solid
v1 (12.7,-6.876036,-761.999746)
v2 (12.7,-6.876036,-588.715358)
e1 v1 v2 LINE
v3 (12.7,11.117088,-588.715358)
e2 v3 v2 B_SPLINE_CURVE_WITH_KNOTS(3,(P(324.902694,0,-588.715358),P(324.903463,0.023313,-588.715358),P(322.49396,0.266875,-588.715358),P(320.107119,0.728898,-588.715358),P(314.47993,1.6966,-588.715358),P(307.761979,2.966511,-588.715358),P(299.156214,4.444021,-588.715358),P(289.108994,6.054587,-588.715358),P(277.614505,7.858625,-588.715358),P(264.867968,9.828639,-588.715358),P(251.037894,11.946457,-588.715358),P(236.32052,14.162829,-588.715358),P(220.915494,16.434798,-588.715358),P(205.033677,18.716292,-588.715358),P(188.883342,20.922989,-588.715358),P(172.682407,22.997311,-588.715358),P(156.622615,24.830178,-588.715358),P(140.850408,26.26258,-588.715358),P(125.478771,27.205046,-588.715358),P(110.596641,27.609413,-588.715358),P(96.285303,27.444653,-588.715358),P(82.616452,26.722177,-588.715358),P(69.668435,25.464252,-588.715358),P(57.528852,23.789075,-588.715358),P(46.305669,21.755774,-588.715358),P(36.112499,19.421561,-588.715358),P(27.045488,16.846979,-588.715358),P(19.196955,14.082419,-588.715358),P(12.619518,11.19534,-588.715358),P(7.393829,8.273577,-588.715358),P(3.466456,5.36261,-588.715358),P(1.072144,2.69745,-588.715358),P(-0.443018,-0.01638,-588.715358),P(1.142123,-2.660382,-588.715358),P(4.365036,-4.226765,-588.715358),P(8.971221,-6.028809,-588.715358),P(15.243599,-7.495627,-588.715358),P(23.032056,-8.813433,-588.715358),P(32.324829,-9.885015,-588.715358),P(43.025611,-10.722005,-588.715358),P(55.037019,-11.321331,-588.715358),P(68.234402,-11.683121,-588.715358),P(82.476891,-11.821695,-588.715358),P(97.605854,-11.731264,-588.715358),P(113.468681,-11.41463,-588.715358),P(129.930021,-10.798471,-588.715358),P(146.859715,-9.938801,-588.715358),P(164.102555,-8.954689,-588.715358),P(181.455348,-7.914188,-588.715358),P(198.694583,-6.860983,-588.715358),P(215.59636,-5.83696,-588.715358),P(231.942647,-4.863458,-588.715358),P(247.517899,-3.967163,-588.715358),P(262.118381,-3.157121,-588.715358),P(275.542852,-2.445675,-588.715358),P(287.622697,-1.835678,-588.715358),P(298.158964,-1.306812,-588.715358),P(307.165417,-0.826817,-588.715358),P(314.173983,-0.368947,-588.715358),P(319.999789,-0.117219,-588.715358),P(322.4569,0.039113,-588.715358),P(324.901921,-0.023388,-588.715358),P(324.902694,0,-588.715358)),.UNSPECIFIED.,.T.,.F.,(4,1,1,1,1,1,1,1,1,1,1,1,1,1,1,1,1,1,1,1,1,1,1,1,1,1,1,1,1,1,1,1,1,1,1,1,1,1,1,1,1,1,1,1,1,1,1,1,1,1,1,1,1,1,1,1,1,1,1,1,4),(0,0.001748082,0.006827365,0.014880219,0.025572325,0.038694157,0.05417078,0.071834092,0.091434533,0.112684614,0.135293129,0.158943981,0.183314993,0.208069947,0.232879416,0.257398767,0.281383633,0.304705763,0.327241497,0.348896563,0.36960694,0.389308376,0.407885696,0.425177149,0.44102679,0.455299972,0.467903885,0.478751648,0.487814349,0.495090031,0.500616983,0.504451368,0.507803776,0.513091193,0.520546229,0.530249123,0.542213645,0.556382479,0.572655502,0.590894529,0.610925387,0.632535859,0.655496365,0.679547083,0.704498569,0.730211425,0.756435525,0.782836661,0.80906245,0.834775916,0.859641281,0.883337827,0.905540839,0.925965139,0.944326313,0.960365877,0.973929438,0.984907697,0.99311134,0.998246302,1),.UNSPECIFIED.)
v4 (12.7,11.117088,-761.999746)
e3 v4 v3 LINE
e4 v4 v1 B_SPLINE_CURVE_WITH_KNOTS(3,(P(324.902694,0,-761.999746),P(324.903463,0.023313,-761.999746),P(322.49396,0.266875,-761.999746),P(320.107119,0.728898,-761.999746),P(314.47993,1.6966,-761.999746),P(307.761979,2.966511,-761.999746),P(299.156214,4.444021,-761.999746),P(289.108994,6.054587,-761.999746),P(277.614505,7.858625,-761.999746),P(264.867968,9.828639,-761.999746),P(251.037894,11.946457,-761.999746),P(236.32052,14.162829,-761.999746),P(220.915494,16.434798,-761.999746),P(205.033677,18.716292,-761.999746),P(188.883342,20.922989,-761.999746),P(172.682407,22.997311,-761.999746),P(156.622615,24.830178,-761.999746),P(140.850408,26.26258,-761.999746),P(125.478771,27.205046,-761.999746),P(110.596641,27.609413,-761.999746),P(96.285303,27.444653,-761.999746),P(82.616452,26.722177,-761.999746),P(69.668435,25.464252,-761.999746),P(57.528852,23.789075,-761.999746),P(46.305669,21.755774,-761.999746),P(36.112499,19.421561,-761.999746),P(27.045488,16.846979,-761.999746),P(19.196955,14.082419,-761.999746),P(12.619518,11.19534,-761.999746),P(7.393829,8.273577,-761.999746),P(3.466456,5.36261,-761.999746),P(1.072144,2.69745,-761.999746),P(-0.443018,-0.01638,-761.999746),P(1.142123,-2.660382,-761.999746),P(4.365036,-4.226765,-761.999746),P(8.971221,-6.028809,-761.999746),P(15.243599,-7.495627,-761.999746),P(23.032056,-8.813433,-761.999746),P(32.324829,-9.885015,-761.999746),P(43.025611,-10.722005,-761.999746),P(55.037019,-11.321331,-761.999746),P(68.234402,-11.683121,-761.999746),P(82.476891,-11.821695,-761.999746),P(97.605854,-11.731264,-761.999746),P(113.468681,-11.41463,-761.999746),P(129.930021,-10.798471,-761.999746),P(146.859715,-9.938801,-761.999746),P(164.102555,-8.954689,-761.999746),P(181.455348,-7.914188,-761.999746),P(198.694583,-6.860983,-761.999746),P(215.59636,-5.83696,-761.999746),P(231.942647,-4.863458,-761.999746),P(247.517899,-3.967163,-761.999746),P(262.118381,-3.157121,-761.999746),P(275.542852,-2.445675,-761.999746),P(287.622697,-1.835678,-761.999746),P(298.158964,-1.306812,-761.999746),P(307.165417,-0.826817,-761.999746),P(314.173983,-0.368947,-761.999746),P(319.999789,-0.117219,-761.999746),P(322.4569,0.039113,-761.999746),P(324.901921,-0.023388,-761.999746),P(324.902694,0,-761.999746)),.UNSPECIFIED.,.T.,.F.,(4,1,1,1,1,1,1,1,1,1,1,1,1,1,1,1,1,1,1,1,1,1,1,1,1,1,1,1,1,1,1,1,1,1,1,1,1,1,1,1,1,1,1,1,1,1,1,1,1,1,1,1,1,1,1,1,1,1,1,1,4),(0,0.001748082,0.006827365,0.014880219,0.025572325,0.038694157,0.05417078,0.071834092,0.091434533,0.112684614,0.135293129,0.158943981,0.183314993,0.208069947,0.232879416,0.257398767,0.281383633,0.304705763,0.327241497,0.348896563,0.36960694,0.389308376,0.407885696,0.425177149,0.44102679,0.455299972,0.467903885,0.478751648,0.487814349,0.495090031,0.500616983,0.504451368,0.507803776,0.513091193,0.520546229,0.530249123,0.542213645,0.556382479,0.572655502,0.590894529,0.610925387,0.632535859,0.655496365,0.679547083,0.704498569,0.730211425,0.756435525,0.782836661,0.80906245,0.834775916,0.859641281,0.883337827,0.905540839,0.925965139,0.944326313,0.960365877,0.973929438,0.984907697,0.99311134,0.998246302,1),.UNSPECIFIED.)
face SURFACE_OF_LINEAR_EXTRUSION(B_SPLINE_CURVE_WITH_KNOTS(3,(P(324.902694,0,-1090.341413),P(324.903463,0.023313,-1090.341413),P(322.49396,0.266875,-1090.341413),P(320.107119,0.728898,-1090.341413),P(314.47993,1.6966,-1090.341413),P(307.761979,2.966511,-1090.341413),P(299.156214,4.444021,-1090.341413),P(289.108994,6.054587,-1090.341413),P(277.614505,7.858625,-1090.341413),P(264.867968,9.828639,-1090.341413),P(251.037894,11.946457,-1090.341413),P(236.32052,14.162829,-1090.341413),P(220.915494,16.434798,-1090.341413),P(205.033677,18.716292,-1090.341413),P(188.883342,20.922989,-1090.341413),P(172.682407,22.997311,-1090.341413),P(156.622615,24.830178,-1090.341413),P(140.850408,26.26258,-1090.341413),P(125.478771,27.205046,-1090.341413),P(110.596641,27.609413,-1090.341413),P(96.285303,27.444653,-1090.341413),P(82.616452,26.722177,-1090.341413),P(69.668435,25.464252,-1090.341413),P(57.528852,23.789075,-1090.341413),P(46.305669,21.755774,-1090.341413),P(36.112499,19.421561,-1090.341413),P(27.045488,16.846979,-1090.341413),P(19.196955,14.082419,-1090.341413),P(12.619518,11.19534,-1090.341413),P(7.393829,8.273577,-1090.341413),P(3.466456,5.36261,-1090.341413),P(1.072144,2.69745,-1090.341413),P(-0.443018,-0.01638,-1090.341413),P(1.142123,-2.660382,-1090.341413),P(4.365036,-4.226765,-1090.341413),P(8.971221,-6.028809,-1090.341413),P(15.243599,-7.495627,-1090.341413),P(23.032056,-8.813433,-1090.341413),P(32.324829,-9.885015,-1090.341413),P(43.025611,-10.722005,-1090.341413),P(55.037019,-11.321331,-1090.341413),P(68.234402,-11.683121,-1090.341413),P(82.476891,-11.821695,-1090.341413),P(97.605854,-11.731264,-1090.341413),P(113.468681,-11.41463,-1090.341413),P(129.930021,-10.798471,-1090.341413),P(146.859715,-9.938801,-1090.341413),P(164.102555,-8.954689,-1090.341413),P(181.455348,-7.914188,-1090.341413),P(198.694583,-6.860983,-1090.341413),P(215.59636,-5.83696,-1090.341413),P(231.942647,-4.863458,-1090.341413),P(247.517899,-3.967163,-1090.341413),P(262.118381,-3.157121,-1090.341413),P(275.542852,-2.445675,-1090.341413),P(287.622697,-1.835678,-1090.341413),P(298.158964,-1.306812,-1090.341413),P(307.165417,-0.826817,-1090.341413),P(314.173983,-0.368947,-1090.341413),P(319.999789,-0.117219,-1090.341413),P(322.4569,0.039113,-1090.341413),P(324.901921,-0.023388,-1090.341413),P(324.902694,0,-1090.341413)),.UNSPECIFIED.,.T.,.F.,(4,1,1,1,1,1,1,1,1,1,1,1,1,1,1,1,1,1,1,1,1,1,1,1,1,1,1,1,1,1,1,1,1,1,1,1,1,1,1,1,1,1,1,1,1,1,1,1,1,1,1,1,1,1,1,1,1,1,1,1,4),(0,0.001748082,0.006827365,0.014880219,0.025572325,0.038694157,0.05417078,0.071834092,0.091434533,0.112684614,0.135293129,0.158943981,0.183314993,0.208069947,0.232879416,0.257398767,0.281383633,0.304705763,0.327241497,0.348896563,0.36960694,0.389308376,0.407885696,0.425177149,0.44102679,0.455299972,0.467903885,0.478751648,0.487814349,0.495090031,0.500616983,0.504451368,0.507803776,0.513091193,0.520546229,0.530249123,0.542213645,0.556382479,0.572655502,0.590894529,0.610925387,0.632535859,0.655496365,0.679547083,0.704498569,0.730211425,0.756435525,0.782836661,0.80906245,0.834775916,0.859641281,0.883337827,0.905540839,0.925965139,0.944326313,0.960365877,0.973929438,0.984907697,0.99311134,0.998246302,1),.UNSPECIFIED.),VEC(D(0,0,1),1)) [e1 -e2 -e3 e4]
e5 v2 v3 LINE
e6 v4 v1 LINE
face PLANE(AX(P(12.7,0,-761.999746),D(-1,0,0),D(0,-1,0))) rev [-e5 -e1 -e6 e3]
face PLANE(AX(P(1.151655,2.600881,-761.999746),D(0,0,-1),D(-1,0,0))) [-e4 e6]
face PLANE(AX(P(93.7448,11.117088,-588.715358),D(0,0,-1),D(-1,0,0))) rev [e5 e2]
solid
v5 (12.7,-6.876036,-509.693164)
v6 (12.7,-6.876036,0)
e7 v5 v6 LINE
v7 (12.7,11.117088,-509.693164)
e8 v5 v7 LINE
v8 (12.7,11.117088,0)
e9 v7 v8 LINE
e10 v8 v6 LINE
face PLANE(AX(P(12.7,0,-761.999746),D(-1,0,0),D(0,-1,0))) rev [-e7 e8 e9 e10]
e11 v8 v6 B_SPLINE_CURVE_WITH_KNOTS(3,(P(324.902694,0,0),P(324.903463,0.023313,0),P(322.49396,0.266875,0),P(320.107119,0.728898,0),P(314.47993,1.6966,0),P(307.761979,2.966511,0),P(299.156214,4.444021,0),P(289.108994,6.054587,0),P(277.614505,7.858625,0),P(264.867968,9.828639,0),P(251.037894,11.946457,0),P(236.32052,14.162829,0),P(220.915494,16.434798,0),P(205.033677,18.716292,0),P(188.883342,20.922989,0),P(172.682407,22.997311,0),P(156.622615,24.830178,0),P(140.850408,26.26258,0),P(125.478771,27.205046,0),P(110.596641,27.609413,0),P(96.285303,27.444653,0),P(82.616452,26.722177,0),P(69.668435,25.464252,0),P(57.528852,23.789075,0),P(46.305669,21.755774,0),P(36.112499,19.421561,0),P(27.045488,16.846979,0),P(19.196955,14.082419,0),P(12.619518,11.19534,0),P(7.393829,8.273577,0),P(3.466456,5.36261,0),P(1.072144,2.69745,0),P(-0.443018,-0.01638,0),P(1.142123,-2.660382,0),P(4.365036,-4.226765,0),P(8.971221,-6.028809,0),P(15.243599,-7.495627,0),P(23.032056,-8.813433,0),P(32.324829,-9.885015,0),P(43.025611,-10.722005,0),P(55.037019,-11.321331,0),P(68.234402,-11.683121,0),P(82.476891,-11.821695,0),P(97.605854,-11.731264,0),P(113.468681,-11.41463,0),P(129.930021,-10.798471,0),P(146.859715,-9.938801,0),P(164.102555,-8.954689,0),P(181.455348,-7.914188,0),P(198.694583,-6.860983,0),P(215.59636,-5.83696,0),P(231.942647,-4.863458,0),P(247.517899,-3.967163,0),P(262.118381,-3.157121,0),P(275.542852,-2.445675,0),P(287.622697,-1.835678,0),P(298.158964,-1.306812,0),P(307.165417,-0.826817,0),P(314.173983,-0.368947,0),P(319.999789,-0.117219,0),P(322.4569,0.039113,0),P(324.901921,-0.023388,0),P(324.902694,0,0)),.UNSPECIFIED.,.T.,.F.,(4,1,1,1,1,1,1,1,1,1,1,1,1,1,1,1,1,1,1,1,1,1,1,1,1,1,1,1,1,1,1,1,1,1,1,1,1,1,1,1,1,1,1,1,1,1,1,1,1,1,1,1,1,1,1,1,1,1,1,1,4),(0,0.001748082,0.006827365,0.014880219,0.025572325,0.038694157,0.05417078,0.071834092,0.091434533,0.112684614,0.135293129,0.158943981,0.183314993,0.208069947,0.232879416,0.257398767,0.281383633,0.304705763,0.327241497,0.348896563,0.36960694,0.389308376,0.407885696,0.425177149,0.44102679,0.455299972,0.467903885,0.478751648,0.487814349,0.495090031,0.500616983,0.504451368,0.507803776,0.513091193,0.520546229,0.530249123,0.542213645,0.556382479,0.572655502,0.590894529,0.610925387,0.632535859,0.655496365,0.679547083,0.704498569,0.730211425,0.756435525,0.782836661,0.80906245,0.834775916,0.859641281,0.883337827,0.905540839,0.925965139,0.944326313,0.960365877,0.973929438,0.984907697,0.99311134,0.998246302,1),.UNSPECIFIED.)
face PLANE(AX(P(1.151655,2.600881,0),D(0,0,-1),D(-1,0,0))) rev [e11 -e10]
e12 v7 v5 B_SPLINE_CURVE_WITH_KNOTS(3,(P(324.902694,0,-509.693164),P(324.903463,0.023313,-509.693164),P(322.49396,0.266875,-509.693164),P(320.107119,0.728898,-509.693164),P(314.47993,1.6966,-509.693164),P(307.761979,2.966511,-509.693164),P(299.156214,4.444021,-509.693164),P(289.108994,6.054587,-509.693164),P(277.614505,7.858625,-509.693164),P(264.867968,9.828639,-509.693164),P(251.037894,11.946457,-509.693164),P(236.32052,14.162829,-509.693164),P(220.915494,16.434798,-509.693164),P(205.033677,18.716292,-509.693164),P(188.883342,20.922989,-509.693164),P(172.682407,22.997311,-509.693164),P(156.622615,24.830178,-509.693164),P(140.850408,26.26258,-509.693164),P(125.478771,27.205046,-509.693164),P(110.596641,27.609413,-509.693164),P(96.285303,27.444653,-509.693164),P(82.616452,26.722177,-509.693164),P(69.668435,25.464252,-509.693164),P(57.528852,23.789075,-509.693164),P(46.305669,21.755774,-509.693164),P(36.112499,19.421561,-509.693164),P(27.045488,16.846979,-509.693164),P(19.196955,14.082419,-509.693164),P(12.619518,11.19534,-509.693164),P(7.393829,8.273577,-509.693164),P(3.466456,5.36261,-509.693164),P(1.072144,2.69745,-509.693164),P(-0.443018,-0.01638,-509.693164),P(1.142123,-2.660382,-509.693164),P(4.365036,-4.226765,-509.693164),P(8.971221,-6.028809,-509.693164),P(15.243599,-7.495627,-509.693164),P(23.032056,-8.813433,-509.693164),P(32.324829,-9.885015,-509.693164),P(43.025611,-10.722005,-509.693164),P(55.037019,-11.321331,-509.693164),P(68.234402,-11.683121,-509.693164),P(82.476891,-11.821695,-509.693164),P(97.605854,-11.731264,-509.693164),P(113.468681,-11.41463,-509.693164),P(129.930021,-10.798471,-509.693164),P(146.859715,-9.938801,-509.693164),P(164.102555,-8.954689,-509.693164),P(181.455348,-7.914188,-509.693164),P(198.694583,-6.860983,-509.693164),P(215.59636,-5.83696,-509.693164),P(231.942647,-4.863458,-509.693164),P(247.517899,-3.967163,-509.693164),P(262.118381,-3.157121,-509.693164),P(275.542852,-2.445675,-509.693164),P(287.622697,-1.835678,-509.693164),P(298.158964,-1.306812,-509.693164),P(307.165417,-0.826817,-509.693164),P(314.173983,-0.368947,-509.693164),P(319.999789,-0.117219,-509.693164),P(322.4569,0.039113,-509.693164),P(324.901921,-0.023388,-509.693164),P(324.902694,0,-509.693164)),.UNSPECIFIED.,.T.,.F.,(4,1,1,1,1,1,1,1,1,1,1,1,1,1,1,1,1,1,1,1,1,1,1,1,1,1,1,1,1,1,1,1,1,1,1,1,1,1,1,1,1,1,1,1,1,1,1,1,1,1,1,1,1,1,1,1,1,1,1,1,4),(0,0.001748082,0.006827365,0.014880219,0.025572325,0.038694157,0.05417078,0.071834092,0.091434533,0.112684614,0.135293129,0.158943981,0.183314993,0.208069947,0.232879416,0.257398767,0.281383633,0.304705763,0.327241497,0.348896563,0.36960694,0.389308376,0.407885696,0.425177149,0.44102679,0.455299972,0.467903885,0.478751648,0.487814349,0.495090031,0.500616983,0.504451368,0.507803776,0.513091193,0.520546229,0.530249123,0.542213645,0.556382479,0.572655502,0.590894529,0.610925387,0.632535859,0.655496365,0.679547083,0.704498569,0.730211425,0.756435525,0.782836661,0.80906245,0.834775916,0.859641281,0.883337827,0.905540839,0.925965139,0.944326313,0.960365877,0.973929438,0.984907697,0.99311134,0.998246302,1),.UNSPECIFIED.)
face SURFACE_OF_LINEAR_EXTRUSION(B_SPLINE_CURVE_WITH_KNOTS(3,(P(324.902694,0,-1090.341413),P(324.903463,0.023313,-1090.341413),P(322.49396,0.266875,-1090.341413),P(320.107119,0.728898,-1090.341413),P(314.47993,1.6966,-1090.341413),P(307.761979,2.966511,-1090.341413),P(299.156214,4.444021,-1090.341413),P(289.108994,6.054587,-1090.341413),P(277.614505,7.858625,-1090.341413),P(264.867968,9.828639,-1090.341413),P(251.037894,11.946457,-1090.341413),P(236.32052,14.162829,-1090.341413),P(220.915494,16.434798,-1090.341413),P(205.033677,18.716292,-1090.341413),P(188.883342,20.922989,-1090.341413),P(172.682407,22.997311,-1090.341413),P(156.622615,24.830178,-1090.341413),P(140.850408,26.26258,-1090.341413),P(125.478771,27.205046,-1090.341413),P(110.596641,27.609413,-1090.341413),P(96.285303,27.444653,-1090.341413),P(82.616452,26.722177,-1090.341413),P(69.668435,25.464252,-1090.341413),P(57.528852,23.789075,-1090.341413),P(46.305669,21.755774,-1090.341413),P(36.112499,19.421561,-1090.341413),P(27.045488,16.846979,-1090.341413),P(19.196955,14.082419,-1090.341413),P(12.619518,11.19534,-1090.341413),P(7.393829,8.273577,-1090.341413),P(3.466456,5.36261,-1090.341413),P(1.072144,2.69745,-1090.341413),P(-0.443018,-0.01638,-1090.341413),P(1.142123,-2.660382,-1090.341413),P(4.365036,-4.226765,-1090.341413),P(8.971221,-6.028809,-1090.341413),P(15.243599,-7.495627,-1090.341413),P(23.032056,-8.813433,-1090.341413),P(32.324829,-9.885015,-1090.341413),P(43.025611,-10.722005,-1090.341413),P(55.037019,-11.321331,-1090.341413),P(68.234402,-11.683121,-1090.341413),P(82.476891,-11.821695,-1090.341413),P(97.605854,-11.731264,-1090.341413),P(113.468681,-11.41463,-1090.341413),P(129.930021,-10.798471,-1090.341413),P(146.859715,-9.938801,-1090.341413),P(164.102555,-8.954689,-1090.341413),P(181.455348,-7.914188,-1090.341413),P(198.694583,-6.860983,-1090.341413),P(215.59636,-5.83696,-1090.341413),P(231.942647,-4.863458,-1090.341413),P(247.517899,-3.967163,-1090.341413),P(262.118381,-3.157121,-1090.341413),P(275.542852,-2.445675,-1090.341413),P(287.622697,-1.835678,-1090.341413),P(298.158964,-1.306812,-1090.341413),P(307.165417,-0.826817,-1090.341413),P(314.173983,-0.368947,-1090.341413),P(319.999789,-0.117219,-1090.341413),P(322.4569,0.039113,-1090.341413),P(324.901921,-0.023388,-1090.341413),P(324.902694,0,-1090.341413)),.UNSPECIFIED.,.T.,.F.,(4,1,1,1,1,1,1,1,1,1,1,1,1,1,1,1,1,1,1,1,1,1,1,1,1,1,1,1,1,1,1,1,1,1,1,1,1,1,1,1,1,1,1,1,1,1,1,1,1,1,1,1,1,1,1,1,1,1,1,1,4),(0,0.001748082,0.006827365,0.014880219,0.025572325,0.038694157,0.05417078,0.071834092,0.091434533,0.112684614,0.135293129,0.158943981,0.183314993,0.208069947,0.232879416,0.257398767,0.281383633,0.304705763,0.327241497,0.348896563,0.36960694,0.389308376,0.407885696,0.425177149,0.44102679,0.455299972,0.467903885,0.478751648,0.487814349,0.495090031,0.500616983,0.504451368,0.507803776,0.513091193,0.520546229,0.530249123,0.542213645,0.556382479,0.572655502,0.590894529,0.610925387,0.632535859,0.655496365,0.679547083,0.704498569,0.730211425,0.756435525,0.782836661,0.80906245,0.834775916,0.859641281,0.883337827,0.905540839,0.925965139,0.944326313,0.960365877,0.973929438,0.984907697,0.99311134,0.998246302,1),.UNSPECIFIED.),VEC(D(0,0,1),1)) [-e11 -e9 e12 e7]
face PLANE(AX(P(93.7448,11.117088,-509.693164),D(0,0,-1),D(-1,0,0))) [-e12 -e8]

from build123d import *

# Parameters (mm, degrees)
BOSS_EXTRUDE2_START = -761.999746
BOSS_EXTRUDE2_DEPTH = 761.999746
CUT_EXTRUDE1_START  = -761.999746
CUT_EXTRUDE1_DEPTH  = 761.999746
SKETCH3_W           = 79.022194
SKETCH3_H           = 17.993123344
CUT_EXTRUDE2_DEPTH  = 12.7


# Read off the part's stored shape, not the designer's step: Cut-Extrude1
with BuildPart() as part:
    # Sketch2 → Boss-Extrude2 (new body)
    with BuildSketch(Plane.XY.offset(BOSS_EXTRUDE2_START)):
        with BuildLine():
            add(Edge.make_bspline(
                [(324.902693551, 0), (324.903463196, 0.023313358), (322.493960125, 0.266874853), (320.107118726, 0.728898482), (314.479929879, 1.696599545), (307.761979309, 2.966510847), (299.156213966, 4.44402059), (289.108994082, 6.054587212), (277.614504557, 7.858625418), (264.867967682, 9.828639283), (251.037893607, 11.946456865), (236.320520328, 14.162828682), (220.915494029, 16.434797842), (205.033677241, 18.716292105), (188.883341887, 20.922988597), (172.682407247, 22.997310524), (156.622614565, 24.830178487), (140.850407651, 26.262579625), (125.478771128, 27.205045845), (110.596641232, 27.609413226), (96.285303339, 27.444653165), (82.616452357, 26.722177249), (69.668434964, 25.464252485), (57.528852266, 23.789075325), (46.305668853, 21.755773795), (36.112498821, 19.421560607), (27.045487678, 16.846978605), (19.196955025, 14.082419467), (12.619518254, 11.195340149), (7.393829249, 8.273577005), (3.466455599, 5.362609604), (1.07214418, 2.697450283), (-0.443018312, -0.016380309), (1.142123289, -2.660381571), (4.36503606, -4.226764571), (8.971221404, -6.028809419), (15.243598774, -7.49562747), (23.03205608, -8.813433078), (32.324829104, -9.885015211), (43.025610851, -10.722004925), (55.037019029, -11.32133074), (68.234402161, -11.683120574), (82.476890937, -11.821694636), (97.60585357, -11.731263556), (113.468681032, -11.414630367), (129.930020513, -10.79847052), (146.859715047, -9.938801137), (164.102555428, -8.954688629), (181.455347718, -7.914187903), (198.694582839, -6.86098311), (215.596359861, -5.836960409), (231.942646987, -4.863457625), (247.517899408, -3.967162621), (262.118380872, -3.157120583), (275.542852028, -2.445675428), (287.622696903, -1.835678138), (298.158964313, -1.306811978), (307.16541669, -0.826816664), (314.173983408, -0.368946975), (319.99978897, -0.117218531), (322.45689994, 0.039112512), (324.901921434, -0.023388259), (324.902693551, 0)],
                knots=[0, 0, 0, 0, 0.001748082, 0.006827365, 0.014880219, 0.025572325, 0.038694157, 0.05417078, 0.071834092, 0.091434533, 0.112684614, 0.135293129, 0.158943981, 0.183314993, 0.208069947, 0.232879416, 0.257398767, 0.281383633, 0.304705763, 0.327241497, 0.348896563, 0.36960694, 0.389308376, 0.407885696, 0.425177149, 0.44102679, 0.455299972, 0.467903885, 0.478751648, 0.487814349, 0.495090031, 0.500616983, 0.504451368, 0.507803776, 0.513091193, 0.520546229, 0.530249123, 0.542213645, 0.556382479, 0.572655502, 0.590894529, 0.610925387, 0.632535859, 0.655496365, 0.679547083, 0.704498569, 0.730211425, 0.756435525, 0.782836661, 0.80906245, 0.834775916, 0.859641281, 0.883337827, 0.905540839, 0.925965139, 0.944326313, 0.960365877, 0.973929438, 0.984907697, 0.99311134, 0.998246302, 1, 1, 1, 1], degree=3))
        make_face()
    extrude(amount=BOSS_EXTRUDE2_DEPTH)

    # Cut-Extrude1 outline → Cut-Extrude1 (cut)
    with BuildSketch(Plane.XY.offset(CUT_EXTRUDE1_START)):
        with BuildLine():
            add(Edge.make_bspline(
                [(324.902693551, 0), (324.903463196, 0.023313358), (322.493960125, 0.266874853), (320.107118726, 0.728898482), (314.479929879, 1.696599545), (307.761979309, 2.966510847), (299.156213966, 4.44402059), (289.108994082, 6.054587212), (277.614504557, 7.858625418), (264.867967682, 9.828639283), (251.037893607, 11.946456865), (236.320520328, 14.162828682), (220.915494029, 16.434797842), (205.033677241, 18.716292105), (188.883341887, 20.922988597), (172.682407247, 22.997310524), (156.622614565, 24.830178487), (140.850407651, 26.262579625), (125.478771128, 27.205045845), (110.596641232, 27.609413226), (96.285303339, 27.444653165), (82.616452357, 26.722177249), (69.668434964, 25.464252485), (57.528852266, 23.789075325), (46.305668853, 21.755773795), (36.112498821, 19.421560607), (27.045487678, 16.846978605), (19.3313577, 14.129761328), (14.714314762, 12.114502523), (12.7, 11.117087729)],
                knots=[0, 0, 0, 0, 0.001748082, 0.006827365, 0.014880219, 0.025572325, 0.038694157, 0.05417078, 0.071834092, 0.091434533, 0.112684614, 0.135293129, 0.158943981, 0.183314993, 0.208069947, 0.232879416, 0.257398767, 0.281383633, 0.304705763, 0.327241497, 0.348896563, 0.36960694, 0.389308376, 0.407885696, 0.425177149, 0.44102679, 0.455299972, 0.467903885, 0.478105627, 0.478105627, 0.478105627, 0.478105627], degree=3))
            Line((12.7, 11.117087729), (12.7, -6.876035615))
            add(Edge.make_bspline(
                [(12.7, -6.876035615), (13.386291094, -7.033779246), (16.659123202, -7.735133954), (23.03205608, -8.813433078), (32.324829104, -9.885015211), (43.025610851, -10.722004925), (55.037019029, -11.32133074), (68.234402161, -11.683120574), (82.476890937, -11.821694636), (97.60585357, -11.731263556), (113.468681032, -11.414630367), (129.930020513, -10.79847052), (146.859715047, -9.938801137), (164.102555428, -8.954688629), (181.455347718, -7.914187903), (198.694582839, -6.86098311), (215.596359861, -5.836960409), (231.942646987, -4.863457625), (247.517899408, -3.967162621), (262.118380872, -3.157120583), (275.542852028, -2.445675428), (287.622696903, -1.835678138), (298.158964313, -1.306811978), (307.16541669, -0.826816664), (314.173983408, -0.368946975), (319.99978897, -0.117218531), (322.45689994, 0.039112512), (324.901921434, -0.023388259), (324.902693551, 0)],
                knots=[0.52705934, 0.52705934, 0.52705934, 0.52705934, 0.530249123, 0.542213645, 0.556382479, 0.572655502, 0.590894529, 0.610925387, 0.632535859, 0.655496365, 0.679547083, 0.704498569, 0.730211425, 0.756435525, 0.782836661, 0.80906245, 0.834775916, 0.859641281, 0.883337827, 0.905540839, 0.925965139, 0.944326313, 0.960365877, 0.973929438, 0.984907697, 0.99311134, 0.998246302, 1, 1, 1, 1], degree=3))
        make_face()
    extrude(amount=CUT_EXTRUDE1_DEPTH, mode=Mode.SUBTRACT)

    # Sketch3 → Cut-Extrude2 (cut)
    with BuildSketch(Plane.ZY):
        with Locations((-549.204261, 2.120526057)):
            Rectangle(SKETCH3_W, SKETCH3_H)
    extrude(amount=-CUT_EXTRUDE2_DEPTH, mode=Mode.SUBTRACT)


with BuildPart() as cut_extrude2_piece_1:
    # of the separate pieces the step leaves, piece 1, a body of its own (cut_extrude2_pieces)
    add(part.part.solids().sort_by_distance((12.7, 11.117087729, -509.693164))[0])


with BuildPart() as cut_extrude2_piece_2:
    # of the separate pieces the step leaves, piece 2, a body of its own (cut_extrude2_pieces)
    add(part.part.solids().sort_by_distance((12.7, 11.117087729, -761.999746))[0])


solid = Compound([cut_extrude2_piece_1.part, cut_extrude2_piece_2.part])
